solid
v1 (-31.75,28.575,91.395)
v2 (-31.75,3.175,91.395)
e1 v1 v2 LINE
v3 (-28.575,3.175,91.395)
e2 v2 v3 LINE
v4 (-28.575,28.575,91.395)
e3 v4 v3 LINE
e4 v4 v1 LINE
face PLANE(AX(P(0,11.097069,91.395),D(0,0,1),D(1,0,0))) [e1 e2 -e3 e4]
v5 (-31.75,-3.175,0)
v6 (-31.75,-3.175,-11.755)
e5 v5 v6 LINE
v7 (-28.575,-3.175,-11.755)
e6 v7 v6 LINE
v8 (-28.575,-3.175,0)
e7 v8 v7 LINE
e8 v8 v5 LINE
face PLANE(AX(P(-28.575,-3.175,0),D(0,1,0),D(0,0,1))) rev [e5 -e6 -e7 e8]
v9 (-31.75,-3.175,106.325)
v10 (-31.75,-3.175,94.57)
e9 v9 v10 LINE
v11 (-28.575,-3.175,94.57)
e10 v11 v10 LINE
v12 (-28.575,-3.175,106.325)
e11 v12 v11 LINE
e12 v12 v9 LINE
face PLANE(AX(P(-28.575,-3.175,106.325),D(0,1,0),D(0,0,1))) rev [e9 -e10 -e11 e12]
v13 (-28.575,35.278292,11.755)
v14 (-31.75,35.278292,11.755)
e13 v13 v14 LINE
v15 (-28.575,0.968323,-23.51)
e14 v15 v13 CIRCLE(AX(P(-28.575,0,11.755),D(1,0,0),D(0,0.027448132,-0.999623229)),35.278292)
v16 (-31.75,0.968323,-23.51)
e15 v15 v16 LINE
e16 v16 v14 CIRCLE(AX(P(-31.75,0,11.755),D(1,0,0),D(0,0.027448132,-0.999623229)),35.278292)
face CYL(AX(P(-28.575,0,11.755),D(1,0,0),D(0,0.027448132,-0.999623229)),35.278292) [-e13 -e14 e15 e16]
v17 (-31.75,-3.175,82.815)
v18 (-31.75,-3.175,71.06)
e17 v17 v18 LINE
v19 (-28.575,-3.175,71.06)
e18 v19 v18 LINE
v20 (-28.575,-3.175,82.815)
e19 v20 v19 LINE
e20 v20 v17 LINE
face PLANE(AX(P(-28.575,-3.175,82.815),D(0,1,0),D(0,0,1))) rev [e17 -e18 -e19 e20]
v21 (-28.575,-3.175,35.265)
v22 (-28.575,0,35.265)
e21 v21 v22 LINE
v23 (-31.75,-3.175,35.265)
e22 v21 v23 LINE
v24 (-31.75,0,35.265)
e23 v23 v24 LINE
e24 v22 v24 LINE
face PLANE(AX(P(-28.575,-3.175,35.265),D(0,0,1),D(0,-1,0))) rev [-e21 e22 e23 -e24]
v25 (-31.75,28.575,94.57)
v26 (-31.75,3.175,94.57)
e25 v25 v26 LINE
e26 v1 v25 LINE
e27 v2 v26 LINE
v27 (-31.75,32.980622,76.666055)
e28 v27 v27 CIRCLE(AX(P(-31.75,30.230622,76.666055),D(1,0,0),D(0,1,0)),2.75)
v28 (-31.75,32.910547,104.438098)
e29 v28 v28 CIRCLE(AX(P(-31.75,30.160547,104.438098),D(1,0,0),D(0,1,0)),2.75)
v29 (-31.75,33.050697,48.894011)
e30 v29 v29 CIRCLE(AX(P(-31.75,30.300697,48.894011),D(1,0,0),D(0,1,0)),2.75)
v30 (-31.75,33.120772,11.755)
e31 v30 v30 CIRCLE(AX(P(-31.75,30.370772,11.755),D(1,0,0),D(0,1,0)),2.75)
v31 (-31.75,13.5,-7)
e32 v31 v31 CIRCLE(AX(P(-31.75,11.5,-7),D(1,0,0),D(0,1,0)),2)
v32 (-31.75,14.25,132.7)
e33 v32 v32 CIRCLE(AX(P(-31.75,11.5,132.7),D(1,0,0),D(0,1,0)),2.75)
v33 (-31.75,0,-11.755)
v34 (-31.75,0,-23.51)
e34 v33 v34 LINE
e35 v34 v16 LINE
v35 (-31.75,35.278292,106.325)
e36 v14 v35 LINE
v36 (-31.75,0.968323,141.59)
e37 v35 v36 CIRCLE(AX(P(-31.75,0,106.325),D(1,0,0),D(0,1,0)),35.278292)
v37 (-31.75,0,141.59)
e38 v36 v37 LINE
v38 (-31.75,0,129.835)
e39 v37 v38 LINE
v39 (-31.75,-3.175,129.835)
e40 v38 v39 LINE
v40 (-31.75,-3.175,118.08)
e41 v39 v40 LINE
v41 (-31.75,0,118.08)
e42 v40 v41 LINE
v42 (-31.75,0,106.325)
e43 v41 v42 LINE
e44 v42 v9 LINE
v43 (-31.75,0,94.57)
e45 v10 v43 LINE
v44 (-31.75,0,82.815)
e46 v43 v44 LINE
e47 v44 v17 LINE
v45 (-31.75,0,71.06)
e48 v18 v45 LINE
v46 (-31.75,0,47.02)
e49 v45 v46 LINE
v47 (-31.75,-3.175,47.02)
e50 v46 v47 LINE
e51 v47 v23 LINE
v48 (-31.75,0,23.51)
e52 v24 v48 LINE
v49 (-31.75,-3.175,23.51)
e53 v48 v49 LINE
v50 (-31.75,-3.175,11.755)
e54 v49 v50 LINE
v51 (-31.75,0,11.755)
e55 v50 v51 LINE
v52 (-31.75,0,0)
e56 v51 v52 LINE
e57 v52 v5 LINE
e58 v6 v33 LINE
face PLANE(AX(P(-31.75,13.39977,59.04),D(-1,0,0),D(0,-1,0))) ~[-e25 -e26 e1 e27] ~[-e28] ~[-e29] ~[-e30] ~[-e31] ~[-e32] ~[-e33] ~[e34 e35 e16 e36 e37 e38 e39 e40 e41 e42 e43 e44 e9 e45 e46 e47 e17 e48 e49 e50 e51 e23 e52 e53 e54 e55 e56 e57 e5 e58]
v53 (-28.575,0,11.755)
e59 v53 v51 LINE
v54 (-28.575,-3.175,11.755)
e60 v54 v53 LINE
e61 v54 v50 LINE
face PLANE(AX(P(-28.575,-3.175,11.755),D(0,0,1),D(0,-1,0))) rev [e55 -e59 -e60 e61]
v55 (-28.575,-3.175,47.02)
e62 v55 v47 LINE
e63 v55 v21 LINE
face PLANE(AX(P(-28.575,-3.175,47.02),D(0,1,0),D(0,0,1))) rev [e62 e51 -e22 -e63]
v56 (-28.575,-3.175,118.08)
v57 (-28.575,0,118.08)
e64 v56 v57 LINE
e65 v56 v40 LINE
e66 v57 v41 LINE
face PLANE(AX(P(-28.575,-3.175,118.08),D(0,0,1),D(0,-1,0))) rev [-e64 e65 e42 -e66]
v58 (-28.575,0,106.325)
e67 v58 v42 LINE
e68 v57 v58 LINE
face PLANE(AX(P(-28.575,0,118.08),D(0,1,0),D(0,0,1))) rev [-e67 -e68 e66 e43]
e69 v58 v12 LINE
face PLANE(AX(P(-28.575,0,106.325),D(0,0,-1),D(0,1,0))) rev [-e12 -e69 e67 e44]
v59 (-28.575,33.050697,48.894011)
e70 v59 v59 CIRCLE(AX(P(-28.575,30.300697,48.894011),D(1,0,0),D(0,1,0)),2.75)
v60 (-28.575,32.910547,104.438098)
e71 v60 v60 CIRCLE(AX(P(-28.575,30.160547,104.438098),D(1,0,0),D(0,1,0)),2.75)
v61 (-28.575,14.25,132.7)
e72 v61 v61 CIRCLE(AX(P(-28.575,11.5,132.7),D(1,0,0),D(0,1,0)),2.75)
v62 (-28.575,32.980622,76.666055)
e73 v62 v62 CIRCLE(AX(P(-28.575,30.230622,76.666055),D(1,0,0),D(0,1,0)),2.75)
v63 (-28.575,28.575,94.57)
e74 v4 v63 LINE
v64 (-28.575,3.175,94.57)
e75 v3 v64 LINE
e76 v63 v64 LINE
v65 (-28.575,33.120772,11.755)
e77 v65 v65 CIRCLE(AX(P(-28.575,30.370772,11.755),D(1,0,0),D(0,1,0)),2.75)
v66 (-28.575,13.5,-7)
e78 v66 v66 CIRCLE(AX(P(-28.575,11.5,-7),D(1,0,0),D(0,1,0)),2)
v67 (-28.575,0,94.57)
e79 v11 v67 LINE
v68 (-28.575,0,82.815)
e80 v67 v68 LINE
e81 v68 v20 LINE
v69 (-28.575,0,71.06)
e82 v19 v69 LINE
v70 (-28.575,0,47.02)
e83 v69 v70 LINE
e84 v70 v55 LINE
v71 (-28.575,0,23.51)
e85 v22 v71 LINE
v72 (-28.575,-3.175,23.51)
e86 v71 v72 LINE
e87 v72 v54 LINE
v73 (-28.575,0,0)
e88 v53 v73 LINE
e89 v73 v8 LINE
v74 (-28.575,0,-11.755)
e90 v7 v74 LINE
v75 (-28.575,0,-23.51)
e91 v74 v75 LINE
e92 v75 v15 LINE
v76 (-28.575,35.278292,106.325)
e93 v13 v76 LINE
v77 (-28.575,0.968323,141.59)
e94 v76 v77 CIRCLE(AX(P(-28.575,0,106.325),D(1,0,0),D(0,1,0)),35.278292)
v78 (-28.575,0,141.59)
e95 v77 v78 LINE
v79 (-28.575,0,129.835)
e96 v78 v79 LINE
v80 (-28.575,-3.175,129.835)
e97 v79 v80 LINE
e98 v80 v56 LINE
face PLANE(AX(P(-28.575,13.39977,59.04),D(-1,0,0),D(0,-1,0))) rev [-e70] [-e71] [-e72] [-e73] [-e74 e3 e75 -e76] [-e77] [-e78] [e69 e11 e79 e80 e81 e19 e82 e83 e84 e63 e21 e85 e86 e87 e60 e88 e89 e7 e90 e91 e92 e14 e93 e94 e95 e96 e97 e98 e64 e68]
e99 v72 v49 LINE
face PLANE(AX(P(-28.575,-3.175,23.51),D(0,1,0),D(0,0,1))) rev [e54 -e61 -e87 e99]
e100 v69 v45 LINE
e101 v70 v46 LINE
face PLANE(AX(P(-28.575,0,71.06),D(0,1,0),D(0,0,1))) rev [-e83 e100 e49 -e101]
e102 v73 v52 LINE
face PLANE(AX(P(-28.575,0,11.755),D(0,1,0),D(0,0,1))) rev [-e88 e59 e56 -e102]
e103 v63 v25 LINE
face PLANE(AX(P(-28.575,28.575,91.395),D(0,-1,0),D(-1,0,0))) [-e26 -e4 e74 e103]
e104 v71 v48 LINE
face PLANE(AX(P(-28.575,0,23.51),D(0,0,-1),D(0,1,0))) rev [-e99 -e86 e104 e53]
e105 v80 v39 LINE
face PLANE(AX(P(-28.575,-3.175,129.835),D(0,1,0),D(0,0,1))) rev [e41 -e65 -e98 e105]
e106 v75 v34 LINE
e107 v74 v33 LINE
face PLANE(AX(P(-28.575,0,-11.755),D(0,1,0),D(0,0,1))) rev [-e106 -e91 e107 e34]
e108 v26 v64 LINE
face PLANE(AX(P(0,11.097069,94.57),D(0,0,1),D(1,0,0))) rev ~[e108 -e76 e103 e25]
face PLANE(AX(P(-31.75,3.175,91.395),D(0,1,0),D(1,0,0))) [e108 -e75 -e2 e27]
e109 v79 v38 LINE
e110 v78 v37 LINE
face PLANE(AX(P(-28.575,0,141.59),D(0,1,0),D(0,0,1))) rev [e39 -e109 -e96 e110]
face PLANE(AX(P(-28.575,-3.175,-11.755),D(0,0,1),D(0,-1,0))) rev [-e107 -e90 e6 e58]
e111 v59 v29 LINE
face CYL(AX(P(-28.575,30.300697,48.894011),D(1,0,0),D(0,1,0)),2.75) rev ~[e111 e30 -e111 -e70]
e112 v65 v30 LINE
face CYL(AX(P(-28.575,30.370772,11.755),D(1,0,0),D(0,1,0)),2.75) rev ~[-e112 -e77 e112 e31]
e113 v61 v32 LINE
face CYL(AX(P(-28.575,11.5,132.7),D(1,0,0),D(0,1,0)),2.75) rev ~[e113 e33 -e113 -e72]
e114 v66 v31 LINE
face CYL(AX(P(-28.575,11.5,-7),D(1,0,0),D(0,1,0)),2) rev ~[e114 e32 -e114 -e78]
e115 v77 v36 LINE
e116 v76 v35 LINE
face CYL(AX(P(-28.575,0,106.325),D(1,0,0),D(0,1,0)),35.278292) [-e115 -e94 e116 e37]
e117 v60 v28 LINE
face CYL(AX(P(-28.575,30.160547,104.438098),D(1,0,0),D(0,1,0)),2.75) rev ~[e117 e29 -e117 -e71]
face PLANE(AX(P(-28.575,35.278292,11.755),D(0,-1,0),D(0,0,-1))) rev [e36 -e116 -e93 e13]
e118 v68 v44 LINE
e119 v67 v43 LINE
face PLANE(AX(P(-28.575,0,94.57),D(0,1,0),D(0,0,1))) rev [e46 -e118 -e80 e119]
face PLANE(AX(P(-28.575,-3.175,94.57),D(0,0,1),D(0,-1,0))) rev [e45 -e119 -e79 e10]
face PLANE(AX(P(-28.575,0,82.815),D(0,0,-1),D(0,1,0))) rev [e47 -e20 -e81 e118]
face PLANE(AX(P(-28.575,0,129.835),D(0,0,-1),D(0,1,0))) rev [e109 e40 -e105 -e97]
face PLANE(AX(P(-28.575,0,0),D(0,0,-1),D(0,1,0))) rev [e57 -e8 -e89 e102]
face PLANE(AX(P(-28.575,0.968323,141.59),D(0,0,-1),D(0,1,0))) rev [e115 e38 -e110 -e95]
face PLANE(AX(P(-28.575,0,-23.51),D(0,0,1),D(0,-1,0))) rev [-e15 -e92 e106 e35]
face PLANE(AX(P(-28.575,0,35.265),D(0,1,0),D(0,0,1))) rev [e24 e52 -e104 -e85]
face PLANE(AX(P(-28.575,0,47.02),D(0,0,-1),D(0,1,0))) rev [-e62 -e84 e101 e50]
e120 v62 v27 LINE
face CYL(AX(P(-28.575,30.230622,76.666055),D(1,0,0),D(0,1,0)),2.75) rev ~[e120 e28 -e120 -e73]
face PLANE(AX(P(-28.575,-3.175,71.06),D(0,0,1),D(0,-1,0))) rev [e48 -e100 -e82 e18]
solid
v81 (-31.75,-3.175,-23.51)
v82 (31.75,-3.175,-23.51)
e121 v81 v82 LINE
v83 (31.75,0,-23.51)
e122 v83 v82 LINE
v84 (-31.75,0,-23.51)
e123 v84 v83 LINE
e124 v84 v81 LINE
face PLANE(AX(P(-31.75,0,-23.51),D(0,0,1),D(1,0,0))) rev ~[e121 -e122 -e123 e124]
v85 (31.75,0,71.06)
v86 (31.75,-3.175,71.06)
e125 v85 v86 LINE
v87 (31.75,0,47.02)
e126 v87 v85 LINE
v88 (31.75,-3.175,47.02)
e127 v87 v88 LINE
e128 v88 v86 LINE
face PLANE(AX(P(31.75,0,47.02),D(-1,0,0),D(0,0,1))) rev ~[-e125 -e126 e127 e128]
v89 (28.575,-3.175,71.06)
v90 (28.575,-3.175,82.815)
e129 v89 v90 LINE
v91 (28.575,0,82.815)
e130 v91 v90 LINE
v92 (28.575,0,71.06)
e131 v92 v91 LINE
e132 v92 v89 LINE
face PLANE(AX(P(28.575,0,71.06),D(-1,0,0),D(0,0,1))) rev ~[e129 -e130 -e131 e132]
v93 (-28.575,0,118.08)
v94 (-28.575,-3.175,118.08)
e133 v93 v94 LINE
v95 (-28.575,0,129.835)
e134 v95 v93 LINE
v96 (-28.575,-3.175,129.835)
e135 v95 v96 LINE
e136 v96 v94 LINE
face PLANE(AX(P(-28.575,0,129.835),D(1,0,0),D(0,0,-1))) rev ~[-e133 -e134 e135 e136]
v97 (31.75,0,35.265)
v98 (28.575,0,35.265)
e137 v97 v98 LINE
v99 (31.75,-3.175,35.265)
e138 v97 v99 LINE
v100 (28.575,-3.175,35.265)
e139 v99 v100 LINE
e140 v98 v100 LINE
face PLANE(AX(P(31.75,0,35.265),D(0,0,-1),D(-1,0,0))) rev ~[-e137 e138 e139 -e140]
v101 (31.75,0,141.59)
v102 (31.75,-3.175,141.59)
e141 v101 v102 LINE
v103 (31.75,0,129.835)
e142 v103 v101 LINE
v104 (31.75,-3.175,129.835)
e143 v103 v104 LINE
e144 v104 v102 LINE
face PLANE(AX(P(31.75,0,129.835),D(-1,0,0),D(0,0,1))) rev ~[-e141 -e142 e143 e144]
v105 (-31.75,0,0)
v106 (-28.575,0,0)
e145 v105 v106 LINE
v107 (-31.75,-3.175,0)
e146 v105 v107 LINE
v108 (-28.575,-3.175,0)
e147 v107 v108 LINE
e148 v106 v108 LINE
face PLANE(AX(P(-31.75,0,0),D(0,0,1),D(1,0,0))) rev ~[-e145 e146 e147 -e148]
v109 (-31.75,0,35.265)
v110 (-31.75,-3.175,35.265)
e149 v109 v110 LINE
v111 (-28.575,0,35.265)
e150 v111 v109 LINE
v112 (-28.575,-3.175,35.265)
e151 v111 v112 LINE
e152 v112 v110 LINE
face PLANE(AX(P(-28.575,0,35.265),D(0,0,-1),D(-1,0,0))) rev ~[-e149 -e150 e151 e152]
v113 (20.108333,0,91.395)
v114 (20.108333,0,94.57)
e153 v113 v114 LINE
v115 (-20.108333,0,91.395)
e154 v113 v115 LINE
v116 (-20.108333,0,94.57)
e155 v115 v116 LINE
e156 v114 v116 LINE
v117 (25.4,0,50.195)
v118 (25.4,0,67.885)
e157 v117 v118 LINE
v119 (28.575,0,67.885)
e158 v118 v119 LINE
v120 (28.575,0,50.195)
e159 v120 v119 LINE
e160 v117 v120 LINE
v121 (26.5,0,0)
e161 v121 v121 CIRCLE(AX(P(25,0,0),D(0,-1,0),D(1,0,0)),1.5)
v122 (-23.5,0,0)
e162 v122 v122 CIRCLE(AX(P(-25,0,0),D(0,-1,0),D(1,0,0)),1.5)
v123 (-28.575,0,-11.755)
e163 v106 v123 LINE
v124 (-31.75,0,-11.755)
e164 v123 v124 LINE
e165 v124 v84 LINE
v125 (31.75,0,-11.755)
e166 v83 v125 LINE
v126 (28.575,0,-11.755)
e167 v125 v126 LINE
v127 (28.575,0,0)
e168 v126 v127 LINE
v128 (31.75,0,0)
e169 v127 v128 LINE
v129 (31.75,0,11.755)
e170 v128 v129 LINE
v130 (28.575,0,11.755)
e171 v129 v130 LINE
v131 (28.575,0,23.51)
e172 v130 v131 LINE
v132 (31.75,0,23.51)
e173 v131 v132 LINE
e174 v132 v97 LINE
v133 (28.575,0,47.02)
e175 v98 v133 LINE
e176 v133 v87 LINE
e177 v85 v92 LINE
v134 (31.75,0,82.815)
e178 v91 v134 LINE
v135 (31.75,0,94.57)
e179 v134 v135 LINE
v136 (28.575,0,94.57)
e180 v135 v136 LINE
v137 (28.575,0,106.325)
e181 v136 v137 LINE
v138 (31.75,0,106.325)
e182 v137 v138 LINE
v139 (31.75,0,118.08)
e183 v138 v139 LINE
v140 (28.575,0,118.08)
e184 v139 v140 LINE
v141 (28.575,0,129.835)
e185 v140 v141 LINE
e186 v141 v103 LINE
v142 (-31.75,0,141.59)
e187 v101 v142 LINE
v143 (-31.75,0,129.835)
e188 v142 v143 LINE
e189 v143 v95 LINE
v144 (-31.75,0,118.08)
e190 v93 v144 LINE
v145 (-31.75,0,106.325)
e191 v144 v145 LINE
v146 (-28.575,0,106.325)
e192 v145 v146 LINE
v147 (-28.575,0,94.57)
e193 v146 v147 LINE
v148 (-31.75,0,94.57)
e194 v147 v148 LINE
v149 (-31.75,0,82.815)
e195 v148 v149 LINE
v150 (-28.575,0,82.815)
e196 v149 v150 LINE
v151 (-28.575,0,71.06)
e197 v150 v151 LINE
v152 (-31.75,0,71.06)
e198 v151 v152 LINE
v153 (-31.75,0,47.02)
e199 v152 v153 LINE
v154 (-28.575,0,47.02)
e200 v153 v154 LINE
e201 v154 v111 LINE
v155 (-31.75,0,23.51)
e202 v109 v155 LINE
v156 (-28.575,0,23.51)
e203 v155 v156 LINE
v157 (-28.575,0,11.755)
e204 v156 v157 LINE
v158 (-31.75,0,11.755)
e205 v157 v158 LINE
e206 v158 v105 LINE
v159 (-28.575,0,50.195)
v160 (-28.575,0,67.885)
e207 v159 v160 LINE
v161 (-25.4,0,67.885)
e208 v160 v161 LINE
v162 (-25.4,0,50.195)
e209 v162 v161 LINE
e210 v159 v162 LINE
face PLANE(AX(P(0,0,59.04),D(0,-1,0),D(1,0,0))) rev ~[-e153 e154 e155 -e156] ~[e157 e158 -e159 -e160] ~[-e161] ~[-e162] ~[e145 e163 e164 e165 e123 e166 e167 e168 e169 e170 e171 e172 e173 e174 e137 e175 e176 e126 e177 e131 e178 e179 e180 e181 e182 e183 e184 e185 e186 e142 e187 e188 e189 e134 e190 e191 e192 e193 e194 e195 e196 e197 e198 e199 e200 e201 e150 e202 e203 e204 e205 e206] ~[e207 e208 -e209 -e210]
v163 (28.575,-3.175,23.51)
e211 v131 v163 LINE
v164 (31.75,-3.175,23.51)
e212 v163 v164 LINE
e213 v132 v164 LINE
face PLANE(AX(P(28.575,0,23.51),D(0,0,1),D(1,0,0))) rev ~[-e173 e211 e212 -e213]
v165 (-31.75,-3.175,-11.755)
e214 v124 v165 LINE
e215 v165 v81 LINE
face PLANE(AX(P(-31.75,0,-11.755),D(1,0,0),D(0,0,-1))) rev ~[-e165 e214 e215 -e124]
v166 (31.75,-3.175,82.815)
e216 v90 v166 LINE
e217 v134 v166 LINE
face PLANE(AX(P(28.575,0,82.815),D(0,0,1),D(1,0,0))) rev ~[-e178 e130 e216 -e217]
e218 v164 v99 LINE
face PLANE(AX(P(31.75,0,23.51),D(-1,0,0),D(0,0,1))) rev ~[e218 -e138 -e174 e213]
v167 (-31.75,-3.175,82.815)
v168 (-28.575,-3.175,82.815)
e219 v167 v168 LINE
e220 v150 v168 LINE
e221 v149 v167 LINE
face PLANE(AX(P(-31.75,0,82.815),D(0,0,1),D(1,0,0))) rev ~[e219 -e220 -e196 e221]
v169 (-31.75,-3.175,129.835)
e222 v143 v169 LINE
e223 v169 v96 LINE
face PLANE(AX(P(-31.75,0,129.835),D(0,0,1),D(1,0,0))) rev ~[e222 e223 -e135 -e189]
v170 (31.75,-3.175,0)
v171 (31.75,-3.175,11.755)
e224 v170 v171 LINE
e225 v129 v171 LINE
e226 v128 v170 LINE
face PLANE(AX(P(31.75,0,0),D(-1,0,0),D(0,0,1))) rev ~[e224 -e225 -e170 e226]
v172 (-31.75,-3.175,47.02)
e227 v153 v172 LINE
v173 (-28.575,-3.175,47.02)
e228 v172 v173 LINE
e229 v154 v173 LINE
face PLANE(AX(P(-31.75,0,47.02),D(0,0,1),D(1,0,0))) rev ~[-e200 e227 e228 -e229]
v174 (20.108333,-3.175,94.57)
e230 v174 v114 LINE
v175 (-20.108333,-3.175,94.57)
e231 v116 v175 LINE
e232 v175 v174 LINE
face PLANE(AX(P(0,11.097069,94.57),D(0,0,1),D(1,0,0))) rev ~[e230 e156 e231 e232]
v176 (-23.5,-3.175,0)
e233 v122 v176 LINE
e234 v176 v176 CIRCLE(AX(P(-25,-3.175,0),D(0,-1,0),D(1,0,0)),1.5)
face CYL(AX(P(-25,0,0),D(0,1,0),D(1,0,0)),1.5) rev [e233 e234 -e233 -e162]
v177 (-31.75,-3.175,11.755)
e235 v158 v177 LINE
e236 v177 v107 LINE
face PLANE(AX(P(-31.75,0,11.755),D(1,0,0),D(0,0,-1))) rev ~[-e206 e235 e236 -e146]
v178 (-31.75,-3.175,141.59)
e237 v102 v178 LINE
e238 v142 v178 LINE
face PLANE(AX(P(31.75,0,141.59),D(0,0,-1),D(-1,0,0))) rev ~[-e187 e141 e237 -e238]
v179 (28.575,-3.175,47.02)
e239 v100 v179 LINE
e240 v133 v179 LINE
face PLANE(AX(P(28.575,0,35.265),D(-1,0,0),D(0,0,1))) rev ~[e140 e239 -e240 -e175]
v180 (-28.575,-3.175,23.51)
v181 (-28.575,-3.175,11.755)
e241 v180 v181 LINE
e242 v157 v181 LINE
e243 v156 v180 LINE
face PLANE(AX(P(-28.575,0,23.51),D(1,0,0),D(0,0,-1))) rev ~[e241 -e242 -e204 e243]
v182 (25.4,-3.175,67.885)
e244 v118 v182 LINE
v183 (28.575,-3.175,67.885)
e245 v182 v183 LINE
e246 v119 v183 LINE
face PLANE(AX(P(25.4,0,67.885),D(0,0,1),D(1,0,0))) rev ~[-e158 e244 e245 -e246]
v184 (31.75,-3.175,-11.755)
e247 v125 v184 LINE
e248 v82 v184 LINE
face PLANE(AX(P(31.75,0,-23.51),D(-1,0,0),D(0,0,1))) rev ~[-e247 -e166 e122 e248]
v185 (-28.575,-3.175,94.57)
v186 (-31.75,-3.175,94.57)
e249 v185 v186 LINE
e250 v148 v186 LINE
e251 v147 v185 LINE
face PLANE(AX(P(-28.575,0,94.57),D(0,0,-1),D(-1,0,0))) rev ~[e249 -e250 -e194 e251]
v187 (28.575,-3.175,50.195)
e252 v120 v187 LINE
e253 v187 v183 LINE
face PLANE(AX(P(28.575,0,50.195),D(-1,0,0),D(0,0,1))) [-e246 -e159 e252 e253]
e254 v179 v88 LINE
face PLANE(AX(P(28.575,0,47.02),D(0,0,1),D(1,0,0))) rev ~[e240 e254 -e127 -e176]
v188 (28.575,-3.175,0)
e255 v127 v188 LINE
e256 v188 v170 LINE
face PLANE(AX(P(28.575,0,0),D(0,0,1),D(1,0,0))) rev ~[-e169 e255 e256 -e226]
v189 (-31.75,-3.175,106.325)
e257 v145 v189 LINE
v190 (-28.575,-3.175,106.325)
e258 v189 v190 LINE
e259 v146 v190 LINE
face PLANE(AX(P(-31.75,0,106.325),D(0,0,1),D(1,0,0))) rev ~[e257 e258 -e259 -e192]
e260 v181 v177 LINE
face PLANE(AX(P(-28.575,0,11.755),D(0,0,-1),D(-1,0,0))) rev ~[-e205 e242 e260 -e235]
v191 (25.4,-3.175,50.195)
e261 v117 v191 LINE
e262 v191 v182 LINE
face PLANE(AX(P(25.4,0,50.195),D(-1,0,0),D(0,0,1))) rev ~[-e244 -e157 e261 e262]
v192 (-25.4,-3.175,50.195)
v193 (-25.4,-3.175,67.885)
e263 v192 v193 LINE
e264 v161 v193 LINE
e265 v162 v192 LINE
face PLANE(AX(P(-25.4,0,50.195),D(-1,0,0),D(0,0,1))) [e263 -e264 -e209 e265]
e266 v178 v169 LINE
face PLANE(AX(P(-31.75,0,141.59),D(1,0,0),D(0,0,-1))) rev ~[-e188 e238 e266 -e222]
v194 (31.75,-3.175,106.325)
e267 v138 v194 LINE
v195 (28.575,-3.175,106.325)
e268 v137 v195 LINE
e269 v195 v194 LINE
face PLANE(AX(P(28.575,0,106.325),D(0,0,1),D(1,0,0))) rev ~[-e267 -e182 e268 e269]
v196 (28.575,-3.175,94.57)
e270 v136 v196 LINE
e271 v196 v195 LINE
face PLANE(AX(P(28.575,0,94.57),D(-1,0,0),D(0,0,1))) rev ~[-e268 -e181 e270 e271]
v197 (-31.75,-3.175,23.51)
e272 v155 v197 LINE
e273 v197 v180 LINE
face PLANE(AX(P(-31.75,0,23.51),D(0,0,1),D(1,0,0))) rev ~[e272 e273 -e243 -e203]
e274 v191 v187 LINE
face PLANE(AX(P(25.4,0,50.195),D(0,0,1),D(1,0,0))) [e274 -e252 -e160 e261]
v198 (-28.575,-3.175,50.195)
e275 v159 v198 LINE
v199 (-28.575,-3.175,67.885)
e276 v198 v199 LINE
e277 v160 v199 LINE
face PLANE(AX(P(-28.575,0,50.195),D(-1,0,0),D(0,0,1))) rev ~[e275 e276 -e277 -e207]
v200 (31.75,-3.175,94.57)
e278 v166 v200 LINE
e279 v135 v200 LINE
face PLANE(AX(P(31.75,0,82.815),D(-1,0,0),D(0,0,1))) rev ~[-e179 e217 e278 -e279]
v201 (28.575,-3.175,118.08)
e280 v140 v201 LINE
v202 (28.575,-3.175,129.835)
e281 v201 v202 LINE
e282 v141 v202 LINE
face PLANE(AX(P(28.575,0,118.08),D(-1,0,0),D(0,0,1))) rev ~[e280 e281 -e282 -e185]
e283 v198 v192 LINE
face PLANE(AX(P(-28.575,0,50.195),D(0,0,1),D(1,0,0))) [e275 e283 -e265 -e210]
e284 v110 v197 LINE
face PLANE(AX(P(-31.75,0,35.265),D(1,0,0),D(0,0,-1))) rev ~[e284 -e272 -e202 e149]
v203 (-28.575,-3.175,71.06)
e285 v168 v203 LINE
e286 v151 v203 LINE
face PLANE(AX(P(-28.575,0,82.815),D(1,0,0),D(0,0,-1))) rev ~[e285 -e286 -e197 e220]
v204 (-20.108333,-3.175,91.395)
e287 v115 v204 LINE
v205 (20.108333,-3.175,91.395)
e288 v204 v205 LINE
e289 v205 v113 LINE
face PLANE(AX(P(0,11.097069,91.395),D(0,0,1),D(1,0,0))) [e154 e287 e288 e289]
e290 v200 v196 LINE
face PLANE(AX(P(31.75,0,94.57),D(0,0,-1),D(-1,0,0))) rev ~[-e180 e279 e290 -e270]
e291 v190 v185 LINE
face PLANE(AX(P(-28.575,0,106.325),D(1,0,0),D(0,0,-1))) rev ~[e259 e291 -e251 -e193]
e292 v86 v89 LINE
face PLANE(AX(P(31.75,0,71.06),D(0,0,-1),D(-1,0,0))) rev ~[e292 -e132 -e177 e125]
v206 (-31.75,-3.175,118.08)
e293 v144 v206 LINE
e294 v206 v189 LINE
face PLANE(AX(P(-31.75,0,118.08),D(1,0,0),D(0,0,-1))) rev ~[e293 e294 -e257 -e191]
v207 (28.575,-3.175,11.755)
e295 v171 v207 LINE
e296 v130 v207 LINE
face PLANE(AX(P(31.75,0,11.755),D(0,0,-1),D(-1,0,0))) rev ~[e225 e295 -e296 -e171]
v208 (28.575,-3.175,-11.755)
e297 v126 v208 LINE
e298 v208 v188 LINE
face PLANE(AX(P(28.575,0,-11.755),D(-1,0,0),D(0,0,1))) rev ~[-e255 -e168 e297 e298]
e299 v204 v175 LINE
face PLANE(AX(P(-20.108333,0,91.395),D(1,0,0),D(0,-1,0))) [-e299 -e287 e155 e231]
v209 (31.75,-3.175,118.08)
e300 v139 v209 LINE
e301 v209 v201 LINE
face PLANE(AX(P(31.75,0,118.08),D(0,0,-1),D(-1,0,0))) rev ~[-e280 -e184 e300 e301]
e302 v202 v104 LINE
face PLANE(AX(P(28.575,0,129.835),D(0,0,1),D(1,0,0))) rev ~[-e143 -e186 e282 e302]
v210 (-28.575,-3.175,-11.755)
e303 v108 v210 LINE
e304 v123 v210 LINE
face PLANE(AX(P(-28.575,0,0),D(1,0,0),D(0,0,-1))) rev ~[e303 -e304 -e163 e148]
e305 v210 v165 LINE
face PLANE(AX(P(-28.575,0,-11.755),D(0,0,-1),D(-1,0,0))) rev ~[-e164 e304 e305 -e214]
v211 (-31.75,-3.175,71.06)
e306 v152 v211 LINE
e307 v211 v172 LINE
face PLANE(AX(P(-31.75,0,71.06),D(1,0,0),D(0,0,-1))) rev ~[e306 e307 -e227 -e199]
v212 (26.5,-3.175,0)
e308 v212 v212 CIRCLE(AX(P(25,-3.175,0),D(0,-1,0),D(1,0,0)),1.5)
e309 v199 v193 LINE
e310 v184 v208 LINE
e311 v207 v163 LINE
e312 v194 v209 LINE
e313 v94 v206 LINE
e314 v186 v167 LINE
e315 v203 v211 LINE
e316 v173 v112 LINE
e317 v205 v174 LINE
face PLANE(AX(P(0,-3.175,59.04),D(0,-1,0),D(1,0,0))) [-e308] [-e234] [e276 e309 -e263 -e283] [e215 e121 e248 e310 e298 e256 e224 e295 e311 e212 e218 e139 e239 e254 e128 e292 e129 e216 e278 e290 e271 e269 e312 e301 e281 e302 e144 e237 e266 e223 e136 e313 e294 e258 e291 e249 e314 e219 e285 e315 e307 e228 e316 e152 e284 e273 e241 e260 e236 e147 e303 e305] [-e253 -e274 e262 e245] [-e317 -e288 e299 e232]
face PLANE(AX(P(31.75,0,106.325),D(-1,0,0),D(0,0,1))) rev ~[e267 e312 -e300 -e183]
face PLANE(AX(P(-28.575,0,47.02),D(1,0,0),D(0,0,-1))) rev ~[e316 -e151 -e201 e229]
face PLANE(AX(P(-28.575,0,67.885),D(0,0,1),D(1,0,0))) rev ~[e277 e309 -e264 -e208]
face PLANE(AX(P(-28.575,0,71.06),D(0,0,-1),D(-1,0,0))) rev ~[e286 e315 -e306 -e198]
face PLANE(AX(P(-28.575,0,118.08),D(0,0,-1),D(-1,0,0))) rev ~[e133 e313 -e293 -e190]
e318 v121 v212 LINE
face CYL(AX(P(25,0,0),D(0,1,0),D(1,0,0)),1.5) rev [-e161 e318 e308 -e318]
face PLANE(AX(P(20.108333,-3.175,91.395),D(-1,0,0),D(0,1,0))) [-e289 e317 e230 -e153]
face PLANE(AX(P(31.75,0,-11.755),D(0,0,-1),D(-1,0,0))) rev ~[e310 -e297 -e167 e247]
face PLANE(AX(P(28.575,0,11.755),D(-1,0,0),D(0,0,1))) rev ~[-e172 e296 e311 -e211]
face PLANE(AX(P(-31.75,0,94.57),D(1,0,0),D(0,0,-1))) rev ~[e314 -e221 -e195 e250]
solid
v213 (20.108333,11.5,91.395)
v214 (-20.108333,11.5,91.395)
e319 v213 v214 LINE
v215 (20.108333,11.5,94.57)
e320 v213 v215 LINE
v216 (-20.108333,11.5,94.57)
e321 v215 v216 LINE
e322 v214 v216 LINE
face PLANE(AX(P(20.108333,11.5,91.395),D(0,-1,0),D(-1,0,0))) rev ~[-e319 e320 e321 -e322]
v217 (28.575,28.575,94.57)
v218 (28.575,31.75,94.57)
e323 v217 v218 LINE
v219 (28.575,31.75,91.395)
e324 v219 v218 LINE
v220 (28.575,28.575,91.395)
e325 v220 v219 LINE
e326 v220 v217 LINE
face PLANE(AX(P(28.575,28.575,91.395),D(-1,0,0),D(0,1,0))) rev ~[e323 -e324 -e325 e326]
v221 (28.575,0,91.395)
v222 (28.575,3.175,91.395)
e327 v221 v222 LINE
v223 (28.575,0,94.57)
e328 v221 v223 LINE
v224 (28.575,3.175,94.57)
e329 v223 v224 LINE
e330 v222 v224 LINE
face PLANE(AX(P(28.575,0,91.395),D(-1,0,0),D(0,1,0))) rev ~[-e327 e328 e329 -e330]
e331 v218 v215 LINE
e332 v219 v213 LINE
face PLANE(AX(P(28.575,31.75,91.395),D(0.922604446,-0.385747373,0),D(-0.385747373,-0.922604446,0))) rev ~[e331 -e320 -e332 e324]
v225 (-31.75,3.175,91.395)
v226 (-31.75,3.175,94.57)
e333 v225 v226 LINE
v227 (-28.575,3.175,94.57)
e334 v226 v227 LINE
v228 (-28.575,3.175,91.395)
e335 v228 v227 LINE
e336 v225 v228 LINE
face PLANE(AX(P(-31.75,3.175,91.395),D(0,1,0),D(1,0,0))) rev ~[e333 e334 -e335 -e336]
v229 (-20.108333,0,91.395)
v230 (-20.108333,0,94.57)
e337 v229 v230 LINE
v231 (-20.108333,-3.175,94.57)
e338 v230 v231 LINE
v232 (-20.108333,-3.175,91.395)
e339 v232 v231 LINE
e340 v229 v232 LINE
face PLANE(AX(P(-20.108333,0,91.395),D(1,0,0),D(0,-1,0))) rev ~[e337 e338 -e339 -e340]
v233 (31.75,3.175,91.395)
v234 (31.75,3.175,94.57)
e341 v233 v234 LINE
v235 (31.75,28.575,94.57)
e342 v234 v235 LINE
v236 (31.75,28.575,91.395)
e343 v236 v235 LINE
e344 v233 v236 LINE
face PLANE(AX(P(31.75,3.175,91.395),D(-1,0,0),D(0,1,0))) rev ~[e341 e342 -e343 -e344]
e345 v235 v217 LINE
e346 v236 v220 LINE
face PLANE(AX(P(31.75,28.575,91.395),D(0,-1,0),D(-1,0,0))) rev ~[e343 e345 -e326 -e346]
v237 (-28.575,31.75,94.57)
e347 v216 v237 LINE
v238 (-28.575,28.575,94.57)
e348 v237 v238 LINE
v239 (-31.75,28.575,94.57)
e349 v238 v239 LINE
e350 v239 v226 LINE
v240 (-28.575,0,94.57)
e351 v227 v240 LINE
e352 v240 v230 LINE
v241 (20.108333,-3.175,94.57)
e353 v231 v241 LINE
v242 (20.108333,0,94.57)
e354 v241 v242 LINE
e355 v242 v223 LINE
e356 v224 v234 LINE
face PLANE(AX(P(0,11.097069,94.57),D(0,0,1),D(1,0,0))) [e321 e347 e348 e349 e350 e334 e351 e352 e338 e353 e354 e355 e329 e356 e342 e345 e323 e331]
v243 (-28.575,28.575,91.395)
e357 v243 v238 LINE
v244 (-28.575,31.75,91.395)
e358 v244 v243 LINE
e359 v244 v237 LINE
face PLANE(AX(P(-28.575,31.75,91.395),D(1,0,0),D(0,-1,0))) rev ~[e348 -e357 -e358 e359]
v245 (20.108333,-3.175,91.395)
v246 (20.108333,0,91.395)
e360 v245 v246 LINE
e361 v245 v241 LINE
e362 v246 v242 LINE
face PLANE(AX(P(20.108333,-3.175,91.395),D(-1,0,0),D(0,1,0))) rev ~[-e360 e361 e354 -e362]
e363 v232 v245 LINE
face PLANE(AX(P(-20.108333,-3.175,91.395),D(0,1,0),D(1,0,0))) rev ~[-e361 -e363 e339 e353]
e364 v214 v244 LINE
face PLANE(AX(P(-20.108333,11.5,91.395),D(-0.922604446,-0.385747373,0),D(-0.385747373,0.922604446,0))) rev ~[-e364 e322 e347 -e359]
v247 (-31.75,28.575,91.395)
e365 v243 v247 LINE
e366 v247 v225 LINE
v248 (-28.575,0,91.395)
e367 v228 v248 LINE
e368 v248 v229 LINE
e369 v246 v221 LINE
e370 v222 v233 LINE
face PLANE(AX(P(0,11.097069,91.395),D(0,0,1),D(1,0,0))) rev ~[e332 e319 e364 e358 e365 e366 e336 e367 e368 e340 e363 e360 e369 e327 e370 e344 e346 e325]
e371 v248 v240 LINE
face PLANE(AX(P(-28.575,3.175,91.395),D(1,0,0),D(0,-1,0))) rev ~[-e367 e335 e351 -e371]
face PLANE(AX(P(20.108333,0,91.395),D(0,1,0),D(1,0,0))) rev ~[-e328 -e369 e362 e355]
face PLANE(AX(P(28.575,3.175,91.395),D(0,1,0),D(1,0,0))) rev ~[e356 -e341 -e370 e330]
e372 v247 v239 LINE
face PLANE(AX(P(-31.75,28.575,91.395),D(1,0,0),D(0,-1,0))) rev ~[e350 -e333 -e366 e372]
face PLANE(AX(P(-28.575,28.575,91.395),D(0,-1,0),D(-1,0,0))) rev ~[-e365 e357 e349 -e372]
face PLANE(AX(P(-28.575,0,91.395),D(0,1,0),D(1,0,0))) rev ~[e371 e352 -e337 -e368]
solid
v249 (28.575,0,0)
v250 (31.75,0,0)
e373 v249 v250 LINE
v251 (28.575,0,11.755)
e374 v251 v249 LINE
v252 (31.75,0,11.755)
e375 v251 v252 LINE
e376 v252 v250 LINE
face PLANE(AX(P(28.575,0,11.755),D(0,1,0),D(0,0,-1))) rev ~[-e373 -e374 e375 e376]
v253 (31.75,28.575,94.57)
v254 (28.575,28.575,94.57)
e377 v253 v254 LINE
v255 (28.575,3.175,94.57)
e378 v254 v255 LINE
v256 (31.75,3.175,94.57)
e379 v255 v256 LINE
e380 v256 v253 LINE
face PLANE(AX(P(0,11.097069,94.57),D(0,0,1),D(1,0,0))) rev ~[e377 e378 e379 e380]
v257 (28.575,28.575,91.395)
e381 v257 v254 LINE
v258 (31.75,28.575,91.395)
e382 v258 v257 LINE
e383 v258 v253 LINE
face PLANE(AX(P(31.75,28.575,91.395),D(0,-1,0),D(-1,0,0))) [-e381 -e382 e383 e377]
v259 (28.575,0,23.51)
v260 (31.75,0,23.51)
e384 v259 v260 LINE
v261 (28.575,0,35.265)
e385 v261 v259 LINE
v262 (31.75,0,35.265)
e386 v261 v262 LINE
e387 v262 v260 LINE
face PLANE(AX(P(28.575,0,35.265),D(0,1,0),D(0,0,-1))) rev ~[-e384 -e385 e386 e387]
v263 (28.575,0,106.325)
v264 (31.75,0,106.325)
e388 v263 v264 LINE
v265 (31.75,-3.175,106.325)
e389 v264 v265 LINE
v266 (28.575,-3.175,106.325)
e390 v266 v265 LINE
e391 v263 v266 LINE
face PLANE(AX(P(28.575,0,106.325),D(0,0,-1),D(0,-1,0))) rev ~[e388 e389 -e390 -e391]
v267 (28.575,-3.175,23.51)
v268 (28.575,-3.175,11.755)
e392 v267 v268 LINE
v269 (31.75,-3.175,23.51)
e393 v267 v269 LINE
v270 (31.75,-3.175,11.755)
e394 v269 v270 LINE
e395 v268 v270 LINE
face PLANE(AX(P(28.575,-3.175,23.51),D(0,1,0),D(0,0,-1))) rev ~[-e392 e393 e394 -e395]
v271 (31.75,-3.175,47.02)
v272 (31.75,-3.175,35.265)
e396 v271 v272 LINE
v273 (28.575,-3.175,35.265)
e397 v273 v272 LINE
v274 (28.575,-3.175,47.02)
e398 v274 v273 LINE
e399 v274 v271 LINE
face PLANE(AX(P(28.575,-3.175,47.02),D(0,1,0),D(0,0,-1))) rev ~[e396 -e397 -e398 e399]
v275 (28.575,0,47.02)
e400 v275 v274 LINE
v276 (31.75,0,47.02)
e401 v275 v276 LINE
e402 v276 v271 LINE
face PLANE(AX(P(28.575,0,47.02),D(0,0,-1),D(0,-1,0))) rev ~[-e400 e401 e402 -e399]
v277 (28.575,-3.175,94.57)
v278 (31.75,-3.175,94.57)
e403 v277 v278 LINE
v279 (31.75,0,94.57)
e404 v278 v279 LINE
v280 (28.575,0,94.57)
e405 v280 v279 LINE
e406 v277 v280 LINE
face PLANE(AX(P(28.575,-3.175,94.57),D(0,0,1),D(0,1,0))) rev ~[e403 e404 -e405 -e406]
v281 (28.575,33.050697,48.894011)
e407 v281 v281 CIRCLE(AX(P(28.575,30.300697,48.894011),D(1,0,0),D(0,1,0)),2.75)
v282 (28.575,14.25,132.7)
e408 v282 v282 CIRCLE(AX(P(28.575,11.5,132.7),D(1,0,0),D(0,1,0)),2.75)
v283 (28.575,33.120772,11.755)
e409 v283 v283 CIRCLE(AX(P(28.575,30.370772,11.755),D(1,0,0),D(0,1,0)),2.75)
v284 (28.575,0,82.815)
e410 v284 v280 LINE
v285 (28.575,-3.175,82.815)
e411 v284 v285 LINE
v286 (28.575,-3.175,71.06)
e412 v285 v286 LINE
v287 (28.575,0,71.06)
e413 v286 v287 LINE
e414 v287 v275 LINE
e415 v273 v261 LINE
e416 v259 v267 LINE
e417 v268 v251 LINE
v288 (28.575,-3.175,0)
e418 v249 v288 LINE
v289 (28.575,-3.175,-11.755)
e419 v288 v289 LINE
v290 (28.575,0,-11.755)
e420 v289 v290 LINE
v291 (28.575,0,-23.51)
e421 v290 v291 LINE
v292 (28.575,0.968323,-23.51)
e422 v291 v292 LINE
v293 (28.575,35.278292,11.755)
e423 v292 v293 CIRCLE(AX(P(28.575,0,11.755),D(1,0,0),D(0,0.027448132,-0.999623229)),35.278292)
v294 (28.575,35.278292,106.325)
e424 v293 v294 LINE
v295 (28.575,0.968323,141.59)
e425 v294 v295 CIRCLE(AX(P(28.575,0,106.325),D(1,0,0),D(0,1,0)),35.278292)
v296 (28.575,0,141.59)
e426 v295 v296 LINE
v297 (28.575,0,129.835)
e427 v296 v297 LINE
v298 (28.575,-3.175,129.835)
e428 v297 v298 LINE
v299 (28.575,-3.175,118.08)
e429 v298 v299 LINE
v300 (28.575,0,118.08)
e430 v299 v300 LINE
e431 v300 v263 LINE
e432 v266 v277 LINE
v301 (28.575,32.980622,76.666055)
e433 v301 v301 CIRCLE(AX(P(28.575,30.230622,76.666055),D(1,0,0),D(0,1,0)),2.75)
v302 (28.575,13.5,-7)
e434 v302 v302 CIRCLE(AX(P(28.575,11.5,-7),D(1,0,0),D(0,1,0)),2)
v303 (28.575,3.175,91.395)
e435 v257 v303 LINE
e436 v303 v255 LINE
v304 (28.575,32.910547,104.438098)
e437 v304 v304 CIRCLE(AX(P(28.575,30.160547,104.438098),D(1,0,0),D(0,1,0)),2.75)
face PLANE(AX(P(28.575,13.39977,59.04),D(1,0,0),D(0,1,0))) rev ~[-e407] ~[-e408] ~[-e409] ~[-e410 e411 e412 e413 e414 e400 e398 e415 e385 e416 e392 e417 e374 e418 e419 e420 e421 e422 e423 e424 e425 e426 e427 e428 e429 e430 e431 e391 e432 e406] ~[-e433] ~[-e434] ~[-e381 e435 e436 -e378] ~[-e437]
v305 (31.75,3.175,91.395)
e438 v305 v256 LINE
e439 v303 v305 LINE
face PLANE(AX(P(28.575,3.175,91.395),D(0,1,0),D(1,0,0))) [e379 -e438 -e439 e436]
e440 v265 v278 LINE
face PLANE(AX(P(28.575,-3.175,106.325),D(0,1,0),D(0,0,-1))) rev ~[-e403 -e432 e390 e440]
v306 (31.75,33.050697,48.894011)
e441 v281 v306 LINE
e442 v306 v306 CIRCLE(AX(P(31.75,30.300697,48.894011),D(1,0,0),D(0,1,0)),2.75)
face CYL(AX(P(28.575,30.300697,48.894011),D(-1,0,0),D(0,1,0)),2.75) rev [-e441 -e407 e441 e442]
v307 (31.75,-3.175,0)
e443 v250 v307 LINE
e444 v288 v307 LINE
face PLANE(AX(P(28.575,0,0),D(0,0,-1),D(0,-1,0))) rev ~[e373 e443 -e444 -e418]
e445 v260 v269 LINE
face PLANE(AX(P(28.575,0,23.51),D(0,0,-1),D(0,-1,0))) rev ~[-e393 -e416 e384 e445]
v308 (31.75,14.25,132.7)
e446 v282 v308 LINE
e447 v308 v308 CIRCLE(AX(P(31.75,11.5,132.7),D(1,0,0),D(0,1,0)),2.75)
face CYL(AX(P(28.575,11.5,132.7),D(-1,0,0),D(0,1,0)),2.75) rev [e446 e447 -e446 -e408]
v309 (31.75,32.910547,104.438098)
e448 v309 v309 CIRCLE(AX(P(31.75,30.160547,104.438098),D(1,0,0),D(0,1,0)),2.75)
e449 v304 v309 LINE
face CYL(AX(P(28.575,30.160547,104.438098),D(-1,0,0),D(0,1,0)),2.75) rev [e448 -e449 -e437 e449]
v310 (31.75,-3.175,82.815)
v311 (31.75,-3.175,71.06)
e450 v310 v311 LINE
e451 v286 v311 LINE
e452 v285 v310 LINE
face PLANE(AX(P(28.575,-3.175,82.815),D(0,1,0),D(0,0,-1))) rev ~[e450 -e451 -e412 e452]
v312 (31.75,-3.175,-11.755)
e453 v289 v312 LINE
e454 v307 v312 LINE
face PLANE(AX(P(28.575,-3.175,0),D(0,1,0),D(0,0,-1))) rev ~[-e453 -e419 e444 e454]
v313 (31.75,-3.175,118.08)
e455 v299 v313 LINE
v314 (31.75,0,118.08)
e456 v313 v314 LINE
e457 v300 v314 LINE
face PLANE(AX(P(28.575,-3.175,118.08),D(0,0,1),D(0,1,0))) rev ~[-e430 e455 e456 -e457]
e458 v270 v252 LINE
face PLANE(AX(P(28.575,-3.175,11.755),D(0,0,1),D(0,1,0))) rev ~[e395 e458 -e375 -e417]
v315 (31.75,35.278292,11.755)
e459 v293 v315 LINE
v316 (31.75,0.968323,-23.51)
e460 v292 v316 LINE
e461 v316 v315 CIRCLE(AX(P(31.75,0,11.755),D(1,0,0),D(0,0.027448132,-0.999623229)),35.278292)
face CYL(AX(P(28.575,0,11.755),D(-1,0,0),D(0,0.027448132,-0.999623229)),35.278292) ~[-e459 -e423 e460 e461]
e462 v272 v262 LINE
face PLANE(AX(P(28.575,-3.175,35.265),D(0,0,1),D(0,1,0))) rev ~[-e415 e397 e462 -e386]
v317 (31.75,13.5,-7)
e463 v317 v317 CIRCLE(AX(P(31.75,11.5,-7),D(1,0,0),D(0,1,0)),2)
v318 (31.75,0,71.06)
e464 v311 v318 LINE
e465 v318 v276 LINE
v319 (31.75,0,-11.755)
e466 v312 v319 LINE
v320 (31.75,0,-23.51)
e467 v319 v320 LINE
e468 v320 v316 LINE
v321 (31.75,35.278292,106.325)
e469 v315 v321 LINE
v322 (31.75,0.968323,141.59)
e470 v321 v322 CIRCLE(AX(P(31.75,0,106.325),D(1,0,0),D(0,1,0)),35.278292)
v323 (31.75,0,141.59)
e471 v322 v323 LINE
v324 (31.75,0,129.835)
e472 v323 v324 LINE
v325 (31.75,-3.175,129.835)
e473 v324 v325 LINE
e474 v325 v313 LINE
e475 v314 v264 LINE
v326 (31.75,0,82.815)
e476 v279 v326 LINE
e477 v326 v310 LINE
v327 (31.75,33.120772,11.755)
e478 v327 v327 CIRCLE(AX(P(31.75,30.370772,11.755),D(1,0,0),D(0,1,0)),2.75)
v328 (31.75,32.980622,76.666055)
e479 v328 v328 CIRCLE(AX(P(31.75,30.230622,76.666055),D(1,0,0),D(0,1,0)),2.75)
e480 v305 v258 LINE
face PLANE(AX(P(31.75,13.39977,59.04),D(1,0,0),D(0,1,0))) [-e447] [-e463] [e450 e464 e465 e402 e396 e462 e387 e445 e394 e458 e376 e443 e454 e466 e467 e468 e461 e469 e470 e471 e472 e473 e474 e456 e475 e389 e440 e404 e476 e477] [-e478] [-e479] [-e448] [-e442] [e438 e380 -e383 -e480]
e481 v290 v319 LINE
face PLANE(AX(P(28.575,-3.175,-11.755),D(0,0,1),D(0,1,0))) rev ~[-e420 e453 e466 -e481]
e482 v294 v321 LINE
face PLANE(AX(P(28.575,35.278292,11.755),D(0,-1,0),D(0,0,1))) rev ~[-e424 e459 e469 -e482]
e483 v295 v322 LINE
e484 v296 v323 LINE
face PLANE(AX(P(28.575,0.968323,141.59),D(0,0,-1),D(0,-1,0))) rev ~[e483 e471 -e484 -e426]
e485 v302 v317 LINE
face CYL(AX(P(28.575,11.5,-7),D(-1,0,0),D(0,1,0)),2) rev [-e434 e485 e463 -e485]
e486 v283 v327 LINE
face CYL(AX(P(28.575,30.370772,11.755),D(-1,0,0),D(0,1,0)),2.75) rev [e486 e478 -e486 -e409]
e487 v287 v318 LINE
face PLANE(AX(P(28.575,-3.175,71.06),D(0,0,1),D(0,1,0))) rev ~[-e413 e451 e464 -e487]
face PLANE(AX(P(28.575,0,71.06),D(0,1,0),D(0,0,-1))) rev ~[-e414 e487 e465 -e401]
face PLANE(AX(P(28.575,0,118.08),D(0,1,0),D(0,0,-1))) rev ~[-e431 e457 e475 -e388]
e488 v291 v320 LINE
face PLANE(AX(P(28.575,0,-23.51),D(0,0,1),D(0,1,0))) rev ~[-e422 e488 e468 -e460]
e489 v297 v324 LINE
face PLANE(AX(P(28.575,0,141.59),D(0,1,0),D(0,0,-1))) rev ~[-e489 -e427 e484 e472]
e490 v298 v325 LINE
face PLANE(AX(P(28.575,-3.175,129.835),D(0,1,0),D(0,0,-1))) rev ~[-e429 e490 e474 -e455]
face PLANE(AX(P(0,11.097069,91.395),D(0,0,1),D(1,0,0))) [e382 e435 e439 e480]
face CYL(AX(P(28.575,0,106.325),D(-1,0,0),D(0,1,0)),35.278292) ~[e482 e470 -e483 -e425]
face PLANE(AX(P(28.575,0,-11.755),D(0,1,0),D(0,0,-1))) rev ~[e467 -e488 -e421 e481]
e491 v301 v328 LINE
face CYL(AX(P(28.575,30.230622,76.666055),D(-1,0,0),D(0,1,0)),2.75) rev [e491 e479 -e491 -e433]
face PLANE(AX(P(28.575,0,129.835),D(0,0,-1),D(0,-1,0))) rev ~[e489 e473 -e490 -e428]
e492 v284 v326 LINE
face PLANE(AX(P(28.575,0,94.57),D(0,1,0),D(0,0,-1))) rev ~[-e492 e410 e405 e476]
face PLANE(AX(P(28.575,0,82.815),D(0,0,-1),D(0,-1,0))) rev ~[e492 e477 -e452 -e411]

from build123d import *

# Parameters (mm, degrees)
F3_R      = 1.5
F3_W      = 3.175
F3_H      = 17.69
F4_DEPTH  = 3.175
F6_START  = 28.575
F5_R      = 2
F5_R_2    = 2.75
F6_DEPTH  = 3.175
F9_START  = 91.395
F9_DEPTH  = 3.175
F10_START = 91.395
F10_DEPTH = 3.175


# Not quite as in the source:
# - a variable given as a bare number and used for a length is read in inches; the dataset says mm whatever the document's units were


with BuildPart() as f4:
    # F3 (on Front) → F4 (new body)
    with BuildSketch(Plane.XZ):
        Polygon((-31.75, -23.51), (0, -23.51), (31.75, -23.51), (31.75, -11.755), (28.575, -11.755), (28.575, 0), (31.75, 0), (31.75, 11.755), (28.575, 11.755), (28.575, 23.51), (31.75, 23.51), (31.75, 35.265), (28.575, 35.265), (28.575, 47.02), (31.75, 47.02), (31.75, 59.04), (31.75, 71.06), (28.575, 71.06), (28.575, 82.815), (31.75, 82.815), (31.75, 94.57), (28.575, 94.57), (28.575, 106.325), (31.75, 106.325), (31.75, 118.08), (28.575, 118.08), (28.575, 129.835), (31.75, 129.835), (31.75, 141.59), (0, 141.59), (-31.75, 141.59), (-31.75, 129.835), (-28.575, 129.835), (-28.575, 118.08), (-31.75, 118.08), (-31.75, 106.325), (-28.575, 106.325), (-28.575, 94.57), (-31.75, 94.57), (-31.75, 82.815), (-28.575, 82.815), (-28.575, 71.06), (-31.75, 71.06), (-31.75, 59.04), (-31.75, 47.02), (-28.575, 47.02), (-28.575, 35.265), (-31.75, 35.265), (-31.75, 23.51), (-28.575, 23.51), (-28.575, 11.755), (-31.75, 11.755), (-31.75, 0), (-28.575, 0), (-28.575, -11.755), (-31.75, -11.755), align=None)
        with Locations((-25, 0)):
            Circle(F3_R, mode=Mode.SUBTRACT)
        with Locations((-26.9875, 59.04)):
            Rectangle(F3_W, F3_H, mode=Mode.SUBTRACT)
        with Locations((25, 0)):
            Circle(F3_R, mode=Mode.SUBTRACT)
        with Locations((26.9875, 59.04)):
            Rectangle(F3_W, F3_H, mode=Mode.SUBTRACT)
    extrude(amount=F4_DEPTH)


with BuildPart() as f6:
    # F5 (on Right) → F6 (new body)
    with BuildSketch(Plane.YZ.offset(F6_START)):
        with BuildLine():
            Line((0, -11.755), (0, -23.51))
            Line((0, -23.51), (0.9683232056, -23.51))
            ThreePointArc((0.9683232056, -23.51), (25.2855557925, -12.8457833838), (35.2782918355, 11.755))
            Line((35.2782918355, 11.755), (35.2782918355, 106.325))
            ThreePointArc((35.2782918355, 106.325), (25.2855557925, 130.9257833838), (0.9683232056, 141.59))
            Line((0.9683232056, 141.59), (0, 141.59))
            Line((0, 141.59), (0, 129.835))
            Line((0, 129.835), (-3.175, 129.835))
            Line((-3.175, 129.835), (-3.175, 118.08))
            Line((-3.175, 118.08), (0, 118.08))
            Line((0, 118.08), (0, 106.325))
            Line((0, 106.325), (-3.175, 106.325))
            Line((-3.175, 106.325), (-3.175, 94.57))
            Line((-3.175, 94.57), (0, 94.57))
            Line((0, 94.57), (0, 82.815))
            Line((0, 82.815), (-3.175, 82.815))
            Line((-3.175, 82.815), (-3.175, 71.06))
            Line((-3.175, 71.06), (0, 71.06))
            Line((0, 71.06), (0, 59.04))
            Line((0, 59.04), (0, 47.02))
            Line((0, 47.02), (-3.175, 47.02))
            Line((-3.175, 47.02), (-3.175, 35.265))
            Line((-3.175, 35.265), (0, 35.265))
            Line((0, 35.265), (0, 23.51))
            Line((0, 23.51), (-3.175, 23.51))
            Line((-3.175, 23.51), (-3.175, 11.755))
            Line((-3.175, 11.755), (0, 11.755))
            Line((0, 11.755), (0, 0))
            Line((0, 0), (-3.175, 0))
            Line((-3.175, 0), (-3.175, -11.755))
            Line((-3.175, -11.755), (0, -11.755))
        make_face()
        with Locations((11.5, -7)):
            Circle(F5_R, mode=Mode.SUBTRACT)
        with Locations((30.370771822, 11.755)):
            Circle(F5_R_2, mode=Mode.SUBTRACT)
        with Locations((30.3006969122, 48.8940113736)):
            Circle(F5_R_2, mode=Mode.SUBTRACT)
        with Locations((11.5, 132.7)):
            Circle(F5_R_2, mode=Mode.SUBTRACT)
        with Locations((30.2306220023, 76.6660547871)):
            Circle(F5_R_2, mode=Mode.SUBTRACT)
        with Locations((30.1605470924, 104.4380982005)):
            Circle(F5_R_2, mode=Mode.SUBTRACT)
    extrude(amount=F6_DEPTH)


with BuildPart() as f7_1:
    # F7: instance of F6
    add(f6.part.mirror(Plane.YZ))


with BuildPart() as f9_tool:
    # F8 (on Top) → F9 (new body)
    with BuildSketch(Plane.XY.offset(F9_START)):
        Polygon((20.1083333333, 11.5), (0, 11.5), (-20.1083333333, 11.5), (-28.575, 31.75), (-28.575, 28.575), (-31.75, 28.575), (-31.75, 3.175), (-28.575, 3.175), (-28.575, 0), (-20.1083333333, 0), (-20.1083333333, -3.175), (0, -3.175), (20.1083333333, -3.175), (20.1083333333, 0), (28.575, 0), (28.575, 3.175), (31.75, 3.175), (31.75, 28.575), (28.575, 28.575), (28.575, 31.75), align=None)
    extrude(amount=F9_DEPTH)


with BuildPart() as f4_1:
    add(f4.part)

    # F9: cut by f9_tool
    add(f9_tool.part, mode=Mode.SUBTRACT)


with BuildPart() as f6_1:
    add(f6.part)

    # F9: cut by f9_tool
    add(f9_tool.part, mode=Mode.SUBTRACT)


with BuildPart() as f7_1_1:
    add(f7_1.part)

    # F9: cut by f9_tool
    add(f9_tool.part, mode=Mode.SUBTRACT)


with BuildPart() as f10:
    # F8 (on Top) → F10 (new body)
    with BuildSketch(Plane.XY.offset(F10_START)):
        Polygon((20.1083333333, 11.5), (0, 11.5), (-20.1083333333, 11.5), (-28.575, 31.75), (-28.575, 28.575), (-31.75, 28.575), (-31.75, 3.175), (-28.575, 3.175), (-28.575, 0), (-20.1083333333, 0), (-20.1083333333, -3.175), (0, -3.175), (20.1083333333, -3.175), (20.1083333333, 0), (28.575, 0), (28.575, 3.175), (31.75, 3.175), (31.75, 28.575), (28.575, 28.575), (28.575, 31.75), align=None)
    extrude(amount=F10_DEPTH)


solid = Compound([f4_1.part, f6_1.part, f7_1_1.part, f10.part])
